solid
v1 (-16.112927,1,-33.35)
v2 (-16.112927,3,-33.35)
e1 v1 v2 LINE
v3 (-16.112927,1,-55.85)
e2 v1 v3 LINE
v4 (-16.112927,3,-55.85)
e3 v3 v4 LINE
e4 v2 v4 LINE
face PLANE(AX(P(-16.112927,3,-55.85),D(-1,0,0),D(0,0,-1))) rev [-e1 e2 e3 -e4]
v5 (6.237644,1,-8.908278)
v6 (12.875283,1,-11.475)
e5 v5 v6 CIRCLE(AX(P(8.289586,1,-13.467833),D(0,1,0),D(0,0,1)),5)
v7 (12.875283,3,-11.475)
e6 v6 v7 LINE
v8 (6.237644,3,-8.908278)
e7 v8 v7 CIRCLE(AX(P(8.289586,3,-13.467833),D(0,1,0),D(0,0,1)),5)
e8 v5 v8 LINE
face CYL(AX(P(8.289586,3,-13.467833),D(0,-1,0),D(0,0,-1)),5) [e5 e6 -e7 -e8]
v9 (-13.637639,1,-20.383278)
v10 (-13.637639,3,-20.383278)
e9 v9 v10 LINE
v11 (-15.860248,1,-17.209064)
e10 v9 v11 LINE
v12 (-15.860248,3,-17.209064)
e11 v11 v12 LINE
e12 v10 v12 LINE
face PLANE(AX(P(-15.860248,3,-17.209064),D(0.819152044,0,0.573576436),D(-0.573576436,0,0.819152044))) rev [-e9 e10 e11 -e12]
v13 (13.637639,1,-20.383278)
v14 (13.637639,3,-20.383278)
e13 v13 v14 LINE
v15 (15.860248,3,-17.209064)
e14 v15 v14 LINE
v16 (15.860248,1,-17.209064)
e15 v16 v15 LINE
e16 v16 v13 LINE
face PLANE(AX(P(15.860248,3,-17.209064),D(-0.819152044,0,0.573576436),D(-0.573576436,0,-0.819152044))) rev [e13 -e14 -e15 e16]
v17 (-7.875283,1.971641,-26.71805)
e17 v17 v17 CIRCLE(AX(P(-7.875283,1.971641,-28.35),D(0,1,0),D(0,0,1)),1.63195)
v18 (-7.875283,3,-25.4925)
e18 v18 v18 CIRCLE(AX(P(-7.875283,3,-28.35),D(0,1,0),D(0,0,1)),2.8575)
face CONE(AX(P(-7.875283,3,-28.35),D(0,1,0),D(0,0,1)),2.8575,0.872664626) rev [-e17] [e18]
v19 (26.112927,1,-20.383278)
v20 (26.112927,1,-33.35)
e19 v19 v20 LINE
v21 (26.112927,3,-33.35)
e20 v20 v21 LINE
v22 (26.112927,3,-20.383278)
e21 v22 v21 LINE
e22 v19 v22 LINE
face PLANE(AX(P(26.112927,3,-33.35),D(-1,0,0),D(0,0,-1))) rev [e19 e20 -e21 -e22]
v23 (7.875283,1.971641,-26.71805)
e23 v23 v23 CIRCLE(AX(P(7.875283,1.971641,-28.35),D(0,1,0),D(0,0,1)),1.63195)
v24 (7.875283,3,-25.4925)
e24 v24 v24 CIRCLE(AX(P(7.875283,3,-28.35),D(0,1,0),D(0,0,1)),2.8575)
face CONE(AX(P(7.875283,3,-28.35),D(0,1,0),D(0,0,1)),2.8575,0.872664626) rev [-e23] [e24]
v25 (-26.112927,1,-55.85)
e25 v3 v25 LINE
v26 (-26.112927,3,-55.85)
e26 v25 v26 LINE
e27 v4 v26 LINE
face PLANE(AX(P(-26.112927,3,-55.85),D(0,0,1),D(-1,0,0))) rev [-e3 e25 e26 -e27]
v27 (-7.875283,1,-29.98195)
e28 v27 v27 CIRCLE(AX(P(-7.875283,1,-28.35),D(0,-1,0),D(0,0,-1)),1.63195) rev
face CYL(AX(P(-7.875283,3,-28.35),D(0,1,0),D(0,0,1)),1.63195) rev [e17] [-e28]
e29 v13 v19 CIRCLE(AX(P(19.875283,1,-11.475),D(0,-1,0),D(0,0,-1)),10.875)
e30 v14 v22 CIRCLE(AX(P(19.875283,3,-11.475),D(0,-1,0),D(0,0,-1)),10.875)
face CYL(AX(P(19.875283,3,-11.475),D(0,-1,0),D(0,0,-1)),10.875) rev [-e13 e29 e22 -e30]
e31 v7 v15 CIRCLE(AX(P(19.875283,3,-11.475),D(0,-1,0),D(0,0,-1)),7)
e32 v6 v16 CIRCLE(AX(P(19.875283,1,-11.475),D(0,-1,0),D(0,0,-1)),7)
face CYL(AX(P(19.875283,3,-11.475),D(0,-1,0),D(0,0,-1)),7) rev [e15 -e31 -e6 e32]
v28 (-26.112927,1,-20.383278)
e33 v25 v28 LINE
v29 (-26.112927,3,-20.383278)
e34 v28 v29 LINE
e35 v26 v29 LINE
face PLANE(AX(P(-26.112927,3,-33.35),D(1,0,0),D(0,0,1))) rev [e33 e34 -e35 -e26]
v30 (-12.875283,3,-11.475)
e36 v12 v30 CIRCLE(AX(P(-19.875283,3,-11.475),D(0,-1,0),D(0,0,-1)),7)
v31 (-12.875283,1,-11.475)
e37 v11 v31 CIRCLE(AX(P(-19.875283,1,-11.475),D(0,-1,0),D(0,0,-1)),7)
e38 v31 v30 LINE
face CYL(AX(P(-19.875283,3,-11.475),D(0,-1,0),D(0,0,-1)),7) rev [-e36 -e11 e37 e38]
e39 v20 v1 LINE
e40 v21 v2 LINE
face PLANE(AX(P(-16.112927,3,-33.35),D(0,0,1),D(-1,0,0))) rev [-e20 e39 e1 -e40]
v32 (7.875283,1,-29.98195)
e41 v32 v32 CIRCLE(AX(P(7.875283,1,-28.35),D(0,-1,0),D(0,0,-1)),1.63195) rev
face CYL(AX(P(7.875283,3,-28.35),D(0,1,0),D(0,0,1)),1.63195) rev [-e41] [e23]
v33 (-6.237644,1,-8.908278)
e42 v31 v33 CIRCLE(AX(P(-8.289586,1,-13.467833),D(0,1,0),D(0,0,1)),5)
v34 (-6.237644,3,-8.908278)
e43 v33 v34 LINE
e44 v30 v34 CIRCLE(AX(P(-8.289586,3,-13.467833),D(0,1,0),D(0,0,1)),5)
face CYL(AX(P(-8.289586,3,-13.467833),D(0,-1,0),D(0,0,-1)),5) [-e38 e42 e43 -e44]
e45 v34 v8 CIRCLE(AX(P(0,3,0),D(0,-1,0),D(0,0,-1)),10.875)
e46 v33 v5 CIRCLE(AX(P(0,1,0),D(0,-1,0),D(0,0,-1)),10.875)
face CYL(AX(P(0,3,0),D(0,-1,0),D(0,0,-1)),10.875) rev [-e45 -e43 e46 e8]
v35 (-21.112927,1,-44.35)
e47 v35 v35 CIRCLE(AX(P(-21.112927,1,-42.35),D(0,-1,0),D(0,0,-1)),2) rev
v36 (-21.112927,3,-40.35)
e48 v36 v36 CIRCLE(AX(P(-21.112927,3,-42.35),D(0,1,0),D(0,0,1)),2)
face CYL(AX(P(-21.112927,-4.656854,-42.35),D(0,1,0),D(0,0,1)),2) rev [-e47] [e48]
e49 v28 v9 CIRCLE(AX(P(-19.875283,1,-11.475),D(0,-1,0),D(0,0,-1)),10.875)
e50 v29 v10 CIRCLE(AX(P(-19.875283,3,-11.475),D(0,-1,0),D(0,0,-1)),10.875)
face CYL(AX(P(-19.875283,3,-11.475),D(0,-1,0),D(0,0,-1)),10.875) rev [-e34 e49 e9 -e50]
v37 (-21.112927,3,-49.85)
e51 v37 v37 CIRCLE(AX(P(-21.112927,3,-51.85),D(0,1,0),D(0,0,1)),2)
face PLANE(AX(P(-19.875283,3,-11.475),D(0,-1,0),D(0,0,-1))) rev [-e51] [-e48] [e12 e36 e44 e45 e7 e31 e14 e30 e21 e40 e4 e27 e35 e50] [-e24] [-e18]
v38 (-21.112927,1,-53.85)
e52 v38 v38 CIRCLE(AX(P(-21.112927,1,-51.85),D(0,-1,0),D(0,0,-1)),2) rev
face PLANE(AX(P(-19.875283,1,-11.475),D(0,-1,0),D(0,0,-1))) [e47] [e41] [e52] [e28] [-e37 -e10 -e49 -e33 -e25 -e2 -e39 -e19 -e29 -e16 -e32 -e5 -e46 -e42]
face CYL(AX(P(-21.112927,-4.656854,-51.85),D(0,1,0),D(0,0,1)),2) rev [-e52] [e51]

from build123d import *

# Parameters (mm, degrees)
BOSS_EXTRUDE1_DEPTH                               = 3
CONVERT_SOLID1_DEPTH                              = 1
SKETCH8_R                                         = 2
CUT_EXTRUDE1_DEPTH                                = 2
CSK_FOR_4_FLAT_HEAD_MACHINE_SCREW_100_D           = 3.2639
CSK_FOR_4_FLAT_HEAD_MACHINE_SCREW_100_DEPTH       = 2
CSK_FOR_4_FLAT_HEAD_MACHINE_SCREW_100_CSINK_D     = 5.715
CSK_FOR_4_FLAT_HEAD_MACHINE_SCREW_100_CSINK_ANGLE = 100
CSK_FOR_4_FLAT_HEAD_MACHINE_SCREW_100_TIP         = 0.980574487


# Read off the part's stored shape, not the designer's step: Convert-Solid1
with BuildPart() as part:
    # Sketch2 → Boss-Extrude1 (new body)
    with BuildSketch(Plane(origin=(0, 0, 0), x_dir=(1, 0, 0), z_dir=(0, 1, 0))):
        with BuildLine():
            Line((-15.860247962, 17.20906431), (-13.637639272, 20.383278482))
            ThreePointArc((-13.637639272, 20.383278482), (-19.875283017, 22.35), (-26.112926762, 20.383278482))
            Line((-26.112926762, 20.383278482), (-26.112926762, 33.35))
            Line((-26.112926762, 33.35), (-26.112926762, 55.85))
            Line((-26.112926762, 55.85), (-16.112926762, 55.85))
            Line((-16.112926762, 55.85), (-16.112926762, 33.35))
            Line((-16.112926762, 33.35), (26.112926762, 33.35))
            Line((26.112926762, 33.35), (26.112926762, 20.383278482))
            ThreePointArc((26.112926762, 20.383278482), (19.875283017, 22.35), (13.637639272, 20.383278482))
            Line((13.637639272, 20.383278482), (15.860247962, 17.20906431))
            ThreePointArc((15.860247962, 17.20906431), (13.666207185, 14.707240293), (12.875283017, 11.475))
            ThreePointArc((12.875283017, 11.475), (10.092914311, 8.804356775), (6.237643745, 8.908278482))
            ThreePointArc((6.237643745, 8.908278482), (0, 10.875), (-6.237643745, 8.908278482))
            ThreePointArc((-6.237643745, 8.908278482), (-10.092914311, 8.804356775), (-12.875283017, 11.475))
            ThreePointArc((-12.875283017, 11.475), (-13.666207185, 14.707240293), (-15.860247962, 17.20906431))
        make_face()
    extrude(amount=BOSS_EXTRUDE1_DEPTH)

    # Convert-Solid1 outline → Convert-Solid1 (cut)
    with BuildSketch(Plane(origin=(0, 0, 0), x_dir=(1, 0, 0), z_dir=(0, 1, 0))):
        with BuildLine():
            Line((-26.112926762, 55.85), (-26.112926762, 20.383278482))
            ThreePointArc((-26.112926762, 20.383278482), (-19.875283017, 22.35), (-13.637639272, 20.383278482))
            Line((-13.637639272, 20.383278482), (-15.860247962, 17.20906431))
            ThreePointArc((-15.860247962, 17.20906431), (-13.666207185, 14.707240292), (-12.875283017, 11.475))
            ThreePointArc((-12.875283017, 11.475), (-10.092914311, 8.804356775), (-6.237643745, 8.908278482))
            ThreePointArc((-6.237643745, 8.908278482), (0, 10.875), (6.237643745, 8.908278482))
            ThreePointArc((6.237643745, 8.908278482), (10.092914311, 8.804356775), (12.875283017, 11.475))
            ThreePointArc((12.875283017, 11.475), (13.666207185, 14.707240292), (15.860247962, 17.20906431))
            Line((15.860247962, 17.20906431), (13.637639272, 20.383278482))
            ThreePointArc((13.637639272, 20.383278482), (19.875283017, 22.35), (26.112926762, 20.383278482))
            Line((26.112926762, 20.383278482), (26.112926762, 33.35))
            Line((26.112926762, 33.35), (-16.112926762, 33.35))
            Line((-16.112926762, 33.35), (-16.112926762, 55.85))
            Line((-16.112926762, 55.85), (-26.112926762, 55.85))
        make_face()
    extrude(amount=CONVERT_SOLID1_DEPTH, mode=Mode.SUBTRACT)

    # Sketch8 → Cut-Extrude1 (cut)
    with BuildSketch(Plane(origin=(0, 3, 0), x_dir=(1, 0, 0), z_dir=(0, 1, 0))):
        with Locations(Location((-21.112926762, 51.85, 0), (0, 0, 270))):
            Circle(SKETCH8_R)
        with Locations(Location((-21.112926762, 42.35, 0), (0, 0, 270))):
            Circle(SKETCH8_R)
    extrude(amount=-CUT_EXTRUDE1_DEPTH, mode=Mode.SUBTRACT)

    # CSK for #4 Flat Head Machine Screw (100)1
    with Locations(Plane(origin=(0, 3, 0), x_dir=(1, 0, 0), z_dir=(0, 1, 0))):
        with Locations((7.875283017, 28.35), (-7.875283017, 28.35)):
            CounterSinkHole(CSK_FOR_4_FLAT_HEAD_MACHINE_SCREW_100_D / 2, CSK_FOR_4_FLAT_HEAD_MACHINE_SCREW_100_CSINK_D / 2, depth=CSK_FOR_4_FLAT_HEAD_MACHINE_SCREW_100_DEPTH, counter_sink_angle=CSK_FOR_4_FLAT_HEAD_MACHINE_SCREW_100_CSINK_ANGLE)
            with Locations((0, 0, -(CSK_FOR_4_FLAT_HEAD_MACHINE_SCREW_100_DEPTH + CSK_FOR_4_FLAT_HEAD_MACHINE_SCREW_100_TIP / 2))):  # 118° drill point
                Cone(0, CSK_FOR_4_FLAT_HEAD_MACHINE_SCREW_100_D / 2, CSK_FOR_4_FLAT_HEAD_MACHINE_SCREW_100_TIP, mode=Mode.SUBTRACT)


solid = part.part
